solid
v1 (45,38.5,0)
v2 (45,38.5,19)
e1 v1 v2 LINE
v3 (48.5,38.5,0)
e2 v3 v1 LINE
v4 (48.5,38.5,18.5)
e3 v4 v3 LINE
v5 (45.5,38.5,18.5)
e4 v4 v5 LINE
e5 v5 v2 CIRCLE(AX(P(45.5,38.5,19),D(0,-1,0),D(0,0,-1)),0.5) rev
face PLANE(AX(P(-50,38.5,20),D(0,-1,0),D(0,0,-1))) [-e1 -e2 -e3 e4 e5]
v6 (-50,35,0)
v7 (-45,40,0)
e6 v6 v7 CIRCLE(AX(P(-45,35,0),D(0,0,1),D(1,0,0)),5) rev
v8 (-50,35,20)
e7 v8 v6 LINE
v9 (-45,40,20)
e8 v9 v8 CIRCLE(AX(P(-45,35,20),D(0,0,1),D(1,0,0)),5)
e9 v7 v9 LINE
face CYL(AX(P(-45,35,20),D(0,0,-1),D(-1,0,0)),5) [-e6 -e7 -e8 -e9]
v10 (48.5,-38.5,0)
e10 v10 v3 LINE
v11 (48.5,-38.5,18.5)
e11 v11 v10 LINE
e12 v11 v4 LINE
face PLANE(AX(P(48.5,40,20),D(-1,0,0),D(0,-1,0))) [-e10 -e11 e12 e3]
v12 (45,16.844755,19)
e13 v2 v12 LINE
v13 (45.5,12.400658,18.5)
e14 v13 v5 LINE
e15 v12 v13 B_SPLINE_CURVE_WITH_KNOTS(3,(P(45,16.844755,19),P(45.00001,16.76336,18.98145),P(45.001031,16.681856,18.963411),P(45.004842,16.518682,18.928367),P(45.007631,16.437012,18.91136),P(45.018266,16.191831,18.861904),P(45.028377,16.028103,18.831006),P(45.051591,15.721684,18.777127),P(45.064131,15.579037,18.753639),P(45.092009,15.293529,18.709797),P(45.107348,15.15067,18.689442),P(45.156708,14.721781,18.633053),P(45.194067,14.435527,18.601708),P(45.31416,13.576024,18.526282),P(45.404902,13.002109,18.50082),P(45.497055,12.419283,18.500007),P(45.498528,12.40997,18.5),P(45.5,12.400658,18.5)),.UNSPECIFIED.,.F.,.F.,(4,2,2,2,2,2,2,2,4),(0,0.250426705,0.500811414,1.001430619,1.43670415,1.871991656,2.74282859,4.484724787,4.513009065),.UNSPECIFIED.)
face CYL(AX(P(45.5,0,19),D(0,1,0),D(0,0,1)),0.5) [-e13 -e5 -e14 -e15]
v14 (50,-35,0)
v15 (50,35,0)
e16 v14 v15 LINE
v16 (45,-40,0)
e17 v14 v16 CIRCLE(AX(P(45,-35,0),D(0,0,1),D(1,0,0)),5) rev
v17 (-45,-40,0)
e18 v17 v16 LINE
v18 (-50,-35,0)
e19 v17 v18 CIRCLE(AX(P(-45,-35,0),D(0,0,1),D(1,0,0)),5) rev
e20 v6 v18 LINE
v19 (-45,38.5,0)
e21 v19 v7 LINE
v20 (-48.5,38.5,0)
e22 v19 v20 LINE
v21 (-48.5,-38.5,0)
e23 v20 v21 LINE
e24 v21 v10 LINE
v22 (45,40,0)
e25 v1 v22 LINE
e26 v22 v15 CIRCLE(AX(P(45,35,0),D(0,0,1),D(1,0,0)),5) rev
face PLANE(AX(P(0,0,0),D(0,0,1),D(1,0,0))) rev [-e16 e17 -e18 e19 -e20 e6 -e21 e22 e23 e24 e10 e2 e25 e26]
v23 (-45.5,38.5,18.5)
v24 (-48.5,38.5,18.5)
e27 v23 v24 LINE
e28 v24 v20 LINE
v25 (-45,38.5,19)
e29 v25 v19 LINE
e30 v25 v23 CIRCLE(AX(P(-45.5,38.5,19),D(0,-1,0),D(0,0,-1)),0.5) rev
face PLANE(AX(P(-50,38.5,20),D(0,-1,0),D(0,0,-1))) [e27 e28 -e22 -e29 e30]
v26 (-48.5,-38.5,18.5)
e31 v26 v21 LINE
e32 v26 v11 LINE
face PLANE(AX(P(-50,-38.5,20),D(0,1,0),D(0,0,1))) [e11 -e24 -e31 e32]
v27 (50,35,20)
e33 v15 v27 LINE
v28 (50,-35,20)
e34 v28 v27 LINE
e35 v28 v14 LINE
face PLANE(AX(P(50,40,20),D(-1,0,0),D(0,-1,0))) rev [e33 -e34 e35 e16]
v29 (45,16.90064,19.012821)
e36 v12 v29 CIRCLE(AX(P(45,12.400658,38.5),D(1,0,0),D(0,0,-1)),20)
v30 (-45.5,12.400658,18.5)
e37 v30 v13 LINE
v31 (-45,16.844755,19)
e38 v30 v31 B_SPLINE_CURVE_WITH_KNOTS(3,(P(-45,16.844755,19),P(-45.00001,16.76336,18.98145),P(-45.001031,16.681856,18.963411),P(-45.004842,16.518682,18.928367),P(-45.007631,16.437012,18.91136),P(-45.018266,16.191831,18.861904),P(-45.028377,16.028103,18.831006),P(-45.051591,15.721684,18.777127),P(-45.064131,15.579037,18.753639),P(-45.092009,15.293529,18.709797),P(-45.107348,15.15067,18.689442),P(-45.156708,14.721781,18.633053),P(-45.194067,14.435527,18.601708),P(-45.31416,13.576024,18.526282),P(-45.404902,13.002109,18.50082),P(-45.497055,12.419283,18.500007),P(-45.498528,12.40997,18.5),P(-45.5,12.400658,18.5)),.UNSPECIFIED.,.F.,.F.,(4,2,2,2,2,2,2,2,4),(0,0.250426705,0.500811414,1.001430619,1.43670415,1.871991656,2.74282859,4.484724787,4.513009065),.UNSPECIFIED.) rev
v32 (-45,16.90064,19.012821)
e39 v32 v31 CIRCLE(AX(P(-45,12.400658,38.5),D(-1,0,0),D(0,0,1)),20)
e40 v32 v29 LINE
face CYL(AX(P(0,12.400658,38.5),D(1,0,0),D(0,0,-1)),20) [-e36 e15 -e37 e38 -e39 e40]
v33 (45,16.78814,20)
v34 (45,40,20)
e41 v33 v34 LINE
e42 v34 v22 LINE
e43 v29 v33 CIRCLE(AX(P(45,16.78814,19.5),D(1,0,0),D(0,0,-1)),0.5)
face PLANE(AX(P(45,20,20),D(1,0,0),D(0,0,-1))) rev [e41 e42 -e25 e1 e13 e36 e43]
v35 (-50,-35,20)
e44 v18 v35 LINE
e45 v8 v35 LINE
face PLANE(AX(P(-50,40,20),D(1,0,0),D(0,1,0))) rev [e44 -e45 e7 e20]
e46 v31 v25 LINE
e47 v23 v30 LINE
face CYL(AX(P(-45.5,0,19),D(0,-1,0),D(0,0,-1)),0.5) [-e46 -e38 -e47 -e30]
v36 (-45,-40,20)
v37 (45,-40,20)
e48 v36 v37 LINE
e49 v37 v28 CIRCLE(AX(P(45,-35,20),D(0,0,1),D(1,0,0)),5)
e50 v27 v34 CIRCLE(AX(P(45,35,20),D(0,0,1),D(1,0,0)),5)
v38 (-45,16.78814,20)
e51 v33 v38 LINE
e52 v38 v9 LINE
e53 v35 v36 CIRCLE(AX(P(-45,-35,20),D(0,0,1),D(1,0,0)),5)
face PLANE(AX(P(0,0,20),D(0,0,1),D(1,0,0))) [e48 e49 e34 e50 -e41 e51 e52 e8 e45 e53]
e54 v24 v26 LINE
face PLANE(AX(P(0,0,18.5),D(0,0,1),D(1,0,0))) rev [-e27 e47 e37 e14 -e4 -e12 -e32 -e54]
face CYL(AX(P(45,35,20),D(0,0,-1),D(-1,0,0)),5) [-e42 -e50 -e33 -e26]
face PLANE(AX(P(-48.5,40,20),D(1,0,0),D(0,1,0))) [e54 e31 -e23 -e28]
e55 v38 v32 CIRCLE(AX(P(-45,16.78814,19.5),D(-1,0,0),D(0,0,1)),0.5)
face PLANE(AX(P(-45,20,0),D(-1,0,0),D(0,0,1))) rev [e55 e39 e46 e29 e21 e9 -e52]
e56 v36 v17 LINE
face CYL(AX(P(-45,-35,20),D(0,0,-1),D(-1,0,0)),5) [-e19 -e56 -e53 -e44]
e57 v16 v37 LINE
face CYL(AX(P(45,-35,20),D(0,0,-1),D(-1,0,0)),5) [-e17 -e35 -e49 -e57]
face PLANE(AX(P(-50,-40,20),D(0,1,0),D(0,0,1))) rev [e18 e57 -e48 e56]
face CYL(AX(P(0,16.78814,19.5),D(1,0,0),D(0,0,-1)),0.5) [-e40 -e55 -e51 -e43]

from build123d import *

# Parameters (mm, degrees)
ESQUISSE1_W             = 100
ESQUISSE1_H             = 80
BOSS_EXTRU_1_DEPTH      = 20
COQUE1_T                = -1.5
CONG_1_R                = 5
ESQUISSE3_W             = 90
ESQUISSE3_H             = 20
ENL_V_MAT_EXTRU_2_DEPTH = 20
CONG_5_R                = 20
CONG_6_R                = 0.5


with BuildPart() as part:
    # Esquisse1 → Boss.-Extru.1 (new body)
    with BuildSketch(Plane.XY):
        Rectangle(ESQUISSE1_W, ESQUISSE1_H)
    extrude(amount=BOSS_EXTRU_1_DEPTH)

    # Coque1
    coque1_openings = [part.faces().sort_by_distance(p)[0] for p in [
        (0, 0, 0),
    ]]
    offset(amount=COQUE1_T, openings=coque1_openings, kind=Kind.INTERSECTION)

    # Congé1
    cong_1_edges = [part.edges().sort_by_distance(p)[0] for p in [
        (50, -40, 10),
        (-50, -40, 10),
        (-50, 40, 10),
        (50, 40, 10),
    ]]
    fillet(cong_1_edges, radius=CONG_1_R)

    # Esquisse3 → Enlèv. mat.-Extru.2 (cut)
    with BuildSketch(Plane(origin=(0, 40, 0), x_dir=(1, 0, 0), z_dir=(0, 1, 0))):
        with Locations((0, -10)):
            Rectangle(ESQUISSE3_W, ESQUISSE3_H)
    extrude(amount=-ENL_V_MAT_EXTRU_2_DEPTH, mode=Mode.SUBTRACT)

    # Congé5
    # the kernel refuses this fillet: 20 mm, written as the material it takes off along each edge
    with BuildSketch(Plane(origin=(-45, 20, 18.5), x_dir=(0, 0, 1), z_dir=(1, 0, 0))) as cong_5_piece_1:
        with BuildLine():
            CenterArc((20, 7.599342077), CONG_5_R, 180, 22.331645009)
            Line((0, 7.599342077), (0, 0))
            Line((0, 0), (1.5, 0))
        make_face()
    extrude(amount=90, mode=Mode.SUBTRACT)

    # Congé6
    cong_6_edges = [part.edges().sort_by_distance(p)[0] for p in [
        (45, 25.450328962, 18.5),
        (0, 20, 20),
        (-45, 25.450328962, 18.5),
    ]]
    fillet(cong_6_edges, radius=CONG_6_R)


solid = part.part
